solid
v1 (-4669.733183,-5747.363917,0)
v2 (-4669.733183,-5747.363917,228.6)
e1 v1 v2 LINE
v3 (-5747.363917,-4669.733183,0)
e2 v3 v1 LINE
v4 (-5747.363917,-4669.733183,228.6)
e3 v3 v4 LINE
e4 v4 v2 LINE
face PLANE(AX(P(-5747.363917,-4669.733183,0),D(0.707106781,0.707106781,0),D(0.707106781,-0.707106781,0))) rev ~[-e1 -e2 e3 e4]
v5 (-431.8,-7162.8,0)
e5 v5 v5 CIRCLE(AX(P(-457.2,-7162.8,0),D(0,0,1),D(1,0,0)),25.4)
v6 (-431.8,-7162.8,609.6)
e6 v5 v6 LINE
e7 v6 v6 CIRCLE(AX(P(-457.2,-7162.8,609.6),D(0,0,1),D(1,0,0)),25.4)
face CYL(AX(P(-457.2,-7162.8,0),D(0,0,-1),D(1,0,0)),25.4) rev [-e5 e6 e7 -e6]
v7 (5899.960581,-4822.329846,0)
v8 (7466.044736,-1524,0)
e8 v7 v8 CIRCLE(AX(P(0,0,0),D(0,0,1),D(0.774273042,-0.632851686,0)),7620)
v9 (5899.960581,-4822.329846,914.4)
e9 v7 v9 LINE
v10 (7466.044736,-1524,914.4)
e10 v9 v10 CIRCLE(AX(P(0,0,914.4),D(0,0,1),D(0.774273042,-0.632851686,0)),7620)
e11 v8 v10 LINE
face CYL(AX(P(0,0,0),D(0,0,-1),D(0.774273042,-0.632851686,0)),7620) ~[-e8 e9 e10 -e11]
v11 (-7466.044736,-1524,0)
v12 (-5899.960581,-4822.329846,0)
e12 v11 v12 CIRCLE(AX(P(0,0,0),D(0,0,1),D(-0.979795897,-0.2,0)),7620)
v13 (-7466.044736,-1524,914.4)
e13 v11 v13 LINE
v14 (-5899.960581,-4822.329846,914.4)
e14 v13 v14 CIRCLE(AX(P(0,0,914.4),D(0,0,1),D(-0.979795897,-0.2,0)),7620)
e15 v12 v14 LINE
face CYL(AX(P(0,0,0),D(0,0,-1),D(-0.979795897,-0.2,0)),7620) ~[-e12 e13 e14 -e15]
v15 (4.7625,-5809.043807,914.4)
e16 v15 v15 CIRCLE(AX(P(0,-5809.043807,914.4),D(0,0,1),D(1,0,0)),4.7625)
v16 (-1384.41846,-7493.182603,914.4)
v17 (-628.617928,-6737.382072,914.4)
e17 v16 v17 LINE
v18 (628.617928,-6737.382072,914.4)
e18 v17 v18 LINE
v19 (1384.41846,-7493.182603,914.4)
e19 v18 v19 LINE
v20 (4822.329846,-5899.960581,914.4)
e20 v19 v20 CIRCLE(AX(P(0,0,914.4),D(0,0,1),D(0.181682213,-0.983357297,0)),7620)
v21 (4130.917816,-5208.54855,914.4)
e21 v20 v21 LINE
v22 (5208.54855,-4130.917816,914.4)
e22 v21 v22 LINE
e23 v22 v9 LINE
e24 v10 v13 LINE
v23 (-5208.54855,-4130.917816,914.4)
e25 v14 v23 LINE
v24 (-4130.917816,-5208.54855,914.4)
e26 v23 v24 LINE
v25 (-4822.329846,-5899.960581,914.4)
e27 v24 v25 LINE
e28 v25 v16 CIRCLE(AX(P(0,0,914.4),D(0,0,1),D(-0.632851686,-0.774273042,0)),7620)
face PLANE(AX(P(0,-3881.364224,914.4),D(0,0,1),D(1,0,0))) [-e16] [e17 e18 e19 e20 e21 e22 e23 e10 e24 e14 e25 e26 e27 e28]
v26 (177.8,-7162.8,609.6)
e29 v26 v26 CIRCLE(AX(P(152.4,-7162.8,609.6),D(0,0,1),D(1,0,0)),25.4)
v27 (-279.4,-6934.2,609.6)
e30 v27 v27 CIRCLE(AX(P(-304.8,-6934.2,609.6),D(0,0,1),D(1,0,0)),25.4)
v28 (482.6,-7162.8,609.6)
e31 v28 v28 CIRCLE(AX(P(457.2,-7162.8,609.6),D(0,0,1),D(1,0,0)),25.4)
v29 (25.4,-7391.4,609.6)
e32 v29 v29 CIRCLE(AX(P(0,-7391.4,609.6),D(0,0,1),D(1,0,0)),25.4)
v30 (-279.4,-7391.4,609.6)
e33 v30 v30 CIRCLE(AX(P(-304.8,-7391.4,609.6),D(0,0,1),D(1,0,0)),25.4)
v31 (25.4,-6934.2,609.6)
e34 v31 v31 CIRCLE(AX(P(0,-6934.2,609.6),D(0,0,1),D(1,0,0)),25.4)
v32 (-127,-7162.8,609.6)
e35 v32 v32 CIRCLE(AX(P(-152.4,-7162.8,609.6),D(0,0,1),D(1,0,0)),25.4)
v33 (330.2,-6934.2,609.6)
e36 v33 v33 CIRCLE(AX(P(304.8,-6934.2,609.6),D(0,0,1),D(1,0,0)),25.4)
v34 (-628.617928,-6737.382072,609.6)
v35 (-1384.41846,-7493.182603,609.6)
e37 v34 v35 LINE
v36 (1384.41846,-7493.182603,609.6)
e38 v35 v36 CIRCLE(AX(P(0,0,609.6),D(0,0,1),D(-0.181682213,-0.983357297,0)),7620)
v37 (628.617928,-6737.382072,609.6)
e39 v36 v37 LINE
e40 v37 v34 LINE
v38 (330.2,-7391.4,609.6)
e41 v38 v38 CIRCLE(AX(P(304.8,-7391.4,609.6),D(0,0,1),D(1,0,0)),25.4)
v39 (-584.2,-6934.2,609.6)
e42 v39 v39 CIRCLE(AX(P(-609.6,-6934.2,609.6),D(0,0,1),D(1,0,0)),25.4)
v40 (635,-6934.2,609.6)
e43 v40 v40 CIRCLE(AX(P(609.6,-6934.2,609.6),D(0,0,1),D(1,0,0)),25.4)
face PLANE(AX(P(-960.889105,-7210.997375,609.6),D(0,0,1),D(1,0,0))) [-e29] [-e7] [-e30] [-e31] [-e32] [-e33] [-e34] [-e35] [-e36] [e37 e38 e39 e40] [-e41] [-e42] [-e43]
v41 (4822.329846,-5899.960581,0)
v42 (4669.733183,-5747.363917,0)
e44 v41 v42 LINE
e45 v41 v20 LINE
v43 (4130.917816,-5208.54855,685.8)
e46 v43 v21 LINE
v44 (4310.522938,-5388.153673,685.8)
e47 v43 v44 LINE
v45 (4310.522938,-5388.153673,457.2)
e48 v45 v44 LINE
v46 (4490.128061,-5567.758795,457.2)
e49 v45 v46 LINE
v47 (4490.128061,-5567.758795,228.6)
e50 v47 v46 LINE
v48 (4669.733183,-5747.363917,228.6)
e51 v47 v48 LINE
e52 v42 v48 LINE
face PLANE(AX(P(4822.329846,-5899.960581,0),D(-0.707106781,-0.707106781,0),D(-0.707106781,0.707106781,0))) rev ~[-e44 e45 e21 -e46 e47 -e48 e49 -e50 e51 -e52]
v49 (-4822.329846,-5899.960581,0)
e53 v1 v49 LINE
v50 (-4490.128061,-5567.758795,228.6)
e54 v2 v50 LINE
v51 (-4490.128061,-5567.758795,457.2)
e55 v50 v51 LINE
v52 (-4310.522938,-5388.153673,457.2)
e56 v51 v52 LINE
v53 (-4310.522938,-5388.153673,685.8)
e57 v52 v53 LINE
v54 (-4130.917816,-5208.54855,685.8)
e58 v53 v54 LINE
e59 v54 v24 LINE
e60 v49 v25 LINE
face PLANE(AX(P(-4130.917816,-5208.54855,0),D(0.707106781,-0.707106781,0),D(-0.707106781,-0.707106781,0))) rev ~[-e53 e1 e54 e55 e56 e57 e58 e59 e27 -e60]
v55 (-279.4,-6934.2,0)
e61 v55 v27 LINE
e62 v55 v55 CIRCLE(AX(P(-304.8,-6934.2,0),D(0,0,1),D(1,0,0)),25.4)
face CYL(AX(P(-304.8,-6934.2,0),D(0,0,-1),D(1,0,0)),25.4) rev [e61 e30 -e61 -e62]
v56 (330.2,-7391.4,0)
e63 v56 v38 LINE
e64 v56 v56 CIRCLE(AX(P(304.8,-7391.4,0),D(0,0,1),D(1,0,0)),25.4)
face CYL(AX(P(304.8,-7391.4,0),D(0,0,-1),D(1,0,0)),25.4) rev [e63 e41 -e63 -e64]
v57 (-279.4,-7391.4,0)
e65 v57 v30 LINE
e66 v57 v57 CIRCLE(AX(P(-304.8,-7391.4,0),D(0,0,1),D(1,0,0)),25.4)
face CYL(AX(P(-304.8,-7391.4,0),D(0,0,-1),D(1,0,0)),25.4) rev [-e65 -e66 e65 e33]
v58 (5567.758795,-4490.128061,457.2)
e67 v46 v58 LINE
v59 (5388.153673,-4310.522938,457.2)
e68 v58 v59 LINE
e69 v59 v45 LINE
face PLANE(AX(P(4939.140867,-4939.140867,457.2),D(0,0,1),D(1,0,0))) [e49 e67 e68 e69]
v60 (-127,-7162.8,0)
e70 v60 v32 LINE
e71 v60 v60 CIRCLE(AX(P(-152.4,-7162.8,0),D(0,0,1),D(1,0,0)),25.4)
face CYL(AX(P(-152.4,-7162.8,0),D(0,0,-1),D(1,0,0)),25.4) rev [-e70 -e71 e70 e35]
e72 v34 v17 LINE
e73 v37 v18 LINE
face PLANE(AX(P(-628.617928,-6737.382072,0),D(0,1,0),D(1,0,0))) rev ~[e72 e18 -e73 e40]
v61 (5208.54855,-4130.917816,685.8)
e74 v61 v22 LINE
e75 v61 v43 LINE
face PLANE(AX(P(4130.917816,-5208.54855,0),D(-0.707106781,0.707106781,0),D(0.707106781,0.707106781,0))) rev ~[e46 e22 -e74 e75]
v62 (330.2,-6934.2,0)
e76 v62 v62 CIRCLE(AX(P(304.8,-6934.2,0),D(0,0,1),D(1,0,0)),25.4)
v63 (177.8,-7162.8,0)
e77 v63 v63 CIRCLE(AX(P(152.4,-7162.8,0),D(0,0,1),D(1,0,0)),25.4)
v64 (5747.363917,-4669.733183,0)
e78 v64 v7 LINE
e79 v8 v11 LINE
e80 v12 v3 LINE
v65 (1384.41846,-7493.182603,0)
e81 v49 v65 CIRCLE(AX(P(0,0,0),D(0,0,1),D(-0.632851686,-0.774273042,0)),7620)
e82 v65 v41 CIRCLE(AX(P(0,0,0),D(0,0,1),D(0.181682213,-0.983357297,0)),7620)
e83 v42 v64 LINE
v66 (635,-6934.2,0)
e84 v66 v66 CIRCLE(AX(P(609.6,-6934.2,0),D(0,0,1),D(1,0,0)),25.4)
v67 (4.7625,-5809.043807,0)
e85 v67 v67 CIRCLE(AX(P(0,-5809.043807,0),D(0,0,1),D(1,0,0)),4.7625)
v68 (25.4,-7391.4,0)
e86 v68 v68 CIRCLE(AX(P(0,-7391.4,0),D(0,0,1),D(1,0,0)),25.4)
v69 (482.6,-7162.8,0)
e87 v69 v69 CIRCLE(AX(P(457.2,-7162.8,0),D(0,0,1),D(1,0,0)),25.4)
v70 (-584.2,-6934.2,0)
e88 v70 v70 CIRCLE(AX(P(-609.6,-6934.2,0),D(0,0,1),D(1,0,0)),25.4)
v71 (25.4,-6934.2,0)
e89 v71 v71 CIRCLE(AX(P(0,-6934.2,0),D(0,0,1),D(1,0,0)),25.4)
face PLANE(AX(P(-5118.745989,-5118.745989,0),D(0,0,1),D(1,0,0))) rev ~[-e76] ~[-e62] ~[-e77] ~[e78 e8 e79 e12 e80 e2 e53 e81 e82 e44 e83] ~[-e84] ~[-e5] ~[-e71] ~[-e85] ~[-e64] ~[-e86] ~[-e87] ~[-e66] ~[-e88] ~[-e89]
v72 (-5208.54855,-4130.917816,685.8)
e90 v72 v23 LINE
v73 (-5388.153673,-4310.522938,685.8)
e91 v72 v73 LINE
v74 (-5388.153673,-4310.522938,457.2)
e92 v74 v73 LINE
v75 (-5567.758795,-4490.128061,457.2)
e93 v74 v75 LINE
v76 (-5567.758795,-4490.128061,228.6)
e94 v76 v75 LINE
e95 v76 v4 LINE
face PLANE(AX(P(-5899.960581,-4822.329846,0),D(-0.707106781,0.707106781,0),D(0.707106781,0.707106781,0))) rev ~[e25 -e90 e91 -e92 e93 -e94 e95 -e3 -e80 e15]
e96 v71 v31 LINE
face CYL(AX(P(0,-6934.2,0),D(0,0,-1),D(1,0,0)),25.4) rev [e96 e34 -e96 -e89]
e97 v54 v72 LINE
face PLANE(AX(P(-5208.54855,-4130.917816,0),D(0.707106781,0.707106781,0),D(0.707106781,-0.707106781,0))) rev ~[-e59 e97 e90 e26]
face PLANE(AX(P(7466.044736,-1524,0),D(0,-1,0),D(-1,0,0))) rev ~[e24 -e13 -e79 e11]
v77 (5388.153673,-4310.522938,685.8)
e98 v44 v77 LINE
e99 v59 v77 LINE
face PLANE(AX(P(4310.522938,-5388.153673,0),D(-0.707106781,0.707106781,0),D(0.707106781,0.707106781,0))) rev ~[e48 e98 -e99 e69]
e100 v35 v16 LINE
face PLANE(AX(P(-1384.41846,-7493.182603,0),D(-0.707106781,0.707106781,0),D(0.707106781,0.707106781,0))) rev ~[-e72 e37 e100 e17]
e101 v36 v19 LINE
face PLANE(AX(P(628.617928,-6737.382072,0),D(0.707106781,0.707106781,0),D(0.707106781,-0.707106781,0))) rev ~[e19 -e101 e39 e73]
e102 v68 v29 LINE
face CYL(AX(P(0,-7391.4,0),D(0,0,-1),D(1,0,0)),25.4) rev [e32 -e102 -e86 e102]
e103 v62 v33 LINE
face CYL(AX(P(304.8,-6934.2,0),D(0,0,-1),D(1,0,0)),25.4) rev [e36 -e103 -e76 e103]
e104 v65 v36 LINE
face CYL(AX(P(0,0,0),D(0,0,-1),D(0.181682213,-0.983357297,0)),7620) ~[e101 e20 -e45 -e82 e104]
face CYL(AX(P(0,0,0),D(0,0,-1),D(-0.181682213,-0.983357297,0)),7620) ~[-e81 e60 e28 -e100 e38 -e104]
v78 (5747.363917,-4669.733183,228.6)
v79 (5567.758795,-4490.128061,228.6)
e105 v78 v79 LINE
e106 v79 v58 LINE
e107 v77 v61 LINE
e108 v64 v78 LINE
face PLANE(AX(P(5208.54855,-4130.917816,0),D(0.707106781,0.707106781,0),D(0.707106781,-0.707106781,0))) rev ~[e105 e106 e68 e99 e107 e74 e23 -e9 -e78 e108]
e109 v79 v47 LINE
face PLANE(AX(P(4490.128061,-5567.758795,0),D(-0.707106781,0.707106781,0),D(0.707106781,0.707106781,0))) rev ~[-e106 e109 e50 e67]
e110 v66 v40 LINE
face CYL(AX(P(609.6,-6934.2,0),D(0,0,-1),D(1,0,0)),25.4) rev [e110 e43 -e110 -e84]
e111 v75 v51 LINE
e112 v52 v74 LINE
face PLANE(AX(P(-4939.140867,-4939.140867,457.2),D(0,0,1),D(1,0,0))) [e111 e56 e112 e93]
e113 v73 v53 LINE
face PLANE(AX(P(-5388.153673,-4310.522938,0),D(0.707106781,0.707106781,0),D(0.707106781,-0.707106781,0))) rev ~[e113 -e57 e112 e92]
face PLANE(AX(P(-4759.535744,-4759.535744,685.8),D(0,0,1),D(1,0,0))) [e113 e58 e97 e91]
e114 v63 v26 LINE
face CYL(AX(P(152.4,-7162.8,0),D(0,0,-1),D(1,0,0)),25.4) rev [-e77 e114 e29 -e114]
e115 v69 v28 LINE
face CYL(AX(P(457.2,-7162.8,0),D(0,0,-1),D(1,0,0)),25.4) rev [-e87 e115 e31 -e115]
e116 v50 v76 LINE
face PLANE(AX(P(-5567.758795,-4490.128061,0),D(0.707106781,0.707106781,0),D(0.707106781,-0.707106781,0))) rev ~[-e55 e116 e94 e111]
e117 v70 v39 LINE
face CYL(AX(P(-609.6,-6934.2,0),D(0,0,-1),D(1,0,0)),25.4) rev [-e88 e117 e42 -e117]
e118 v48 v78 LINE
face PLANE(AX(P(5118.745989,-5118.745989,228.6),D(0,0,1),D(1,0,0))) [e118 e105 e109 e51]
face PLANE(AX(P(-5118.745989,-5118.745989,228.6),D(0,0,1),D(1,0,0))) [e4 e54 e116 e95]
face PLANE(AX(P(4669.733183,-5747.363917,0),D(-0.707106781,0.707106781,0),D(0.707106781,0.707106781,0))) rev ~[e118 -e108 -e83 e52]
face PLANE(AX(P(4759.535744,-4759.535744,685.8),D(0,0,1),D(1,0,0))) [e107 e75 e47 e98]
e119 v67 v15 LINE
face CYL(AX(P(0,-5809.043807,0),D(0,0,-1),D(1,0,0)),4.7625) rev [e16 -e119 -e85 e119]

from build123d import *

# Parameters (mm, degrees)
F0_R     = 4.7625
F1_DEPTH = 914.4
F0_R_2   = 25.4
F2_DEPTH = 609.6
F3_DEPTH = 685.8
F4_DEPTH = 457.2
F5_DEPTH = 228.6


# Not quite as in the source:
# - a feature names something its author has since deleted; it is built from what else it names


with BuildPart() as f1:
    # F0 (on Top) → F1 (new body)
    with BuildSketch(Plane.XY):
        with BuildLine():
            ThreePointArc((5899.9605807424, -4822.3298462139), (6883.4780071868, -3268.3528763853), (7466.0447360031, -1524))
            Line((7466.0447360031, -1524), (-7466.0447360031, -1524))
            ThreePointArc((-7466.0447360031, -1524), (-6883.4780071868, -3268.3528763853), (-5899.9605807424, -4822.3298462139))
            Line((-5899.9605807423, -4822.329846214), (-5747.3639174843, -4669.733182956))
            Line((-5747.3639174843, -4669.733182956), (-5567.7587950629, -4490.1280605346))
            Line((-5567.7587950629, -4490.1280605346), (-5388.1536726415, -4310.5229381132))
            Line((-5388.1536726415, -4310.5229381132), (-5208.5485502201, -4130.9178156918))
            Line((-5208.5485502201, -4130.9178156918), (-4130.9178156918, -5208.5485502201))
            Line((-4130.9178156918, -5208.5485502201), (-4310.5229381132, -5388.1536726415))
            Line((-4310.5229381132, -5388.1536726415), (-4490.1280605346, -5567.7587950629))
            Line((-4490.1280605346, -5567.7587950629), (-4669.733182956, -5747.3639174843))
            Line((-4669.733182956, -5747.3639174843), (-4822.329846214, -5899.9605807423))
            ThreePointArc((-4822.3298462139, -5899.9605807424), (-3203.9850558878, -6913.6733913056), (-1384.4184602791, -7493.1826033294))
            Line((-1384.4184602791, -7493.1826033294), (-628.6179284748, -6737.3820715252))
            ThreePointArc((-628.6179284748, -6737.3820715252), (0, -6477), (628.6179284748, -6737.3820715252))
            Line((628.6179284748, -6737.3820715252), (1384.4184602791, -7493.1826033294))
            ThreePointArc((1384.4184602791, -7493.1826033294), (3203.9850558878, -6913.6733913056), (4822.3298462139, -5899.9605807424))
            Line((4822.329846214, -5899.9605807423), (4669.733182956, -5747.3639174843))
            Line((4669.733182956, -5747.3639174843), (4490.1280605346, -5567.7587950629))
            Line((4490.1280605346, -5567.7587950629), (4310.5229381132, -5388.1536726415))
            Line((4310.5229381132, -5388.1536726415), (4130.9178156918, -5208.5485502201))
            Line((4130.9178156918, -5208.5485502201), (5208.5485502201, -4130.9178156918))
            Line((5208.5485502201, -4130.9178156918), (5388.1536726415, -4310.5229381132))
            Line((5388.1536726415, -4310.5229381132), (5567.7587950629, -4490.1280605346))
            Line((5567.7587950629, -4490.1280605346), (5747.3639174843, -4669.733182956))
            Line((5747.3639174843, -4669.733182956), (5899.9605807423, -4822.329846214))
        make_face()
        with Locations((0, -5809.0438066988)):
            Circle(F0_R, mode=Mode.SUBTRACT)
        with BuildLine():
            Line((-628.6179284748, -6737.3820715252), (628.6179284748, -6737.3820715252))
            ThreePointArc((628.6179284748, -6737.3820715252), (0, -6477), (-628.6179284748, -6737.3820715252))
        make_face()
    extrude(amount=F1_DEPTH)

    # F0 (on Top) → F2 (join)
    with BuildSketch(Plane.XY):
        with BuildLine():
            Line((-628.6179284748, -6737.3820715252), (-1384.4184602791, -7493.1826033294))
            ThreePointArc((-1384.4184602791, -7493.1826033294), (-1125.4295623842, -7536.4320669739), (-865.104327551, -7570.7327586207))
            ThreePointArc((-865.104327551, -7570.7327586207), (-855.2308965756, -7123.3044838845), (-628.6179284748, -6737.3820715252))
        make_face()
        with BuildLine():
            ThreePointArc((865.104327551, -7570.7327586207), (1125.4295623842, -7536.4320669739), (1384.4184602791, -7493.1826033294))
            Line((1384.4184602791, -7493.1826033294), (628.6179284748, -6737.3820715252))
            ThreePointArc((628.6179284748, -6737.3820715252), (821.3289044025, -7025.7944286274), (889, -7366))
            ThreePointArc((889, -7366), (883.0058740441, -7469.0612749948), (865.104327551, -7570.7327586207))
        make_face()
        with BuildLine():
            ThreePointArc((-865.104327551, -7570.7327586207), (0, -7620), (865.104327551, -7570.7327586207))
            ThreePointArc((865.104327551, -7570.7327586207), (883.0058740441, -7469.0612749948), (889, -7366))
            ThreePointArc((889, -7366), (821.3289044025, -7025.7944286274), (628.6179284748, -6737.3820715252))
            Line((628.6179284748, -6737.3820715252), (-628.6179284748, -6737.3820715252))
            ThreePointArc((-628.6179284748, -6737.3820715252), (-855.2308965756, -7123.3044838845), (-865.104327551, -7570.7327586207))
        make_face()
        with Locations((-304.8, -7391.4)):
            Circle(F0_R_2, mode=Mode.SUBTRACT)
        with Locations((0, -7391.4)):
            Circle(F0_R_2, mode=Mode.SUBTRACT)
        with Locations((-457.2, -7162.8)):
            Circle(F0_R_2, mode=Mode.SUBTRACT)
        with Locations((-152.4, -7162.8)):
            Circle(F0_R_2, mode=Mode.SUBTRACT)
        with Locations((-609.6, -6934.2)):
            Circle(F0_R_2, mode=Mode.SUBTRACT)
        with Locations((-304.8, -6934.2)):
            Circle(F0_R_2, mode=Mode.SUBTRACT)
        with Locations((0, -6934.2)):
            Circle(F0_R_2, mode=Mode.SUBTRACT)
        with Locations((304.8, -7391.4)):
            Circle(F0_R_2, mode=Mode.SUBTRACT)
        with Locations((152.4, -7162.8)):
            Circle(F0_R_2, mode=Mode.SUBTRACT)
        with Locations((457.2, -7162.8)):
            Circle(F0_R_2, mode=Mode.SUBTRACT)
        with Locations((304.8, -6934.2)):
            Circle(F0_R_2, mode=Mode.SUBTRACT)
        with Locations((609.6, -6934.2)):
            Circle(F0_R_2, mode=Mode.SUBTRACT)
    extrude(amount=F2_DEPTH)

    # F0 (on Top) → F3 (join)
    with BuildSketch(Plane.XY):
        Polygon((-5208.5485502201, -4130.9178156918), (-5388.1536726415, -4310.5229381132), (-4310.5229381132, -5388.1536726415), (-4130.9178156918, -5208.5485502201), align=None)
        Polygon((4310.5229381132, -5388.1536726415), (5388.1536726415, -4310.5229381132), (5208.5485502201, -4130.9178156918), (4130.9178156918, -5208.5485502201), align=None)
    extrude(amount=F3_DEPTH)

    # F0 (on Top) → F4 (join)
    with BuildSketch(Plane.XY):
        Polygon((-5388.1536726415, -4310.5229381132), (-5567.7587950629, -4490.1280605346), (-4490.1280605346, -5567.7587950629), (-4310.5229381132, -5388.1536726415), align=None)
        Polygon((4490.1280605346, -5567.7587950629), (5567.7587950629, -4490.1280605346), (5388.1536726415, -4310.5229381132), (4310.5229381132, -5388.1536726415), align=None)
    extrude(amount=F4_DEPTH)

    # F0 (on Top) → F5 (join)
    with BuildSketch(Plane.XY):
        Polygon((-5567.7587950629, -4490.1280605346), (-5747.3639174843, -4669.733182956), (-4669.733182956, -5747.3639174843), (-4490.1280605346, -5567.7587950629), align=None)
        Polygon((4669.733182956, -5747.3639174843), (5747.3639174843, -4669.733182956), (5567.7587950629, -4490.1280605346), (4490.1280605346, -5567.7587950629), align=None)
    extrude(amount=F5_DEPTH)


solid = f1.part
